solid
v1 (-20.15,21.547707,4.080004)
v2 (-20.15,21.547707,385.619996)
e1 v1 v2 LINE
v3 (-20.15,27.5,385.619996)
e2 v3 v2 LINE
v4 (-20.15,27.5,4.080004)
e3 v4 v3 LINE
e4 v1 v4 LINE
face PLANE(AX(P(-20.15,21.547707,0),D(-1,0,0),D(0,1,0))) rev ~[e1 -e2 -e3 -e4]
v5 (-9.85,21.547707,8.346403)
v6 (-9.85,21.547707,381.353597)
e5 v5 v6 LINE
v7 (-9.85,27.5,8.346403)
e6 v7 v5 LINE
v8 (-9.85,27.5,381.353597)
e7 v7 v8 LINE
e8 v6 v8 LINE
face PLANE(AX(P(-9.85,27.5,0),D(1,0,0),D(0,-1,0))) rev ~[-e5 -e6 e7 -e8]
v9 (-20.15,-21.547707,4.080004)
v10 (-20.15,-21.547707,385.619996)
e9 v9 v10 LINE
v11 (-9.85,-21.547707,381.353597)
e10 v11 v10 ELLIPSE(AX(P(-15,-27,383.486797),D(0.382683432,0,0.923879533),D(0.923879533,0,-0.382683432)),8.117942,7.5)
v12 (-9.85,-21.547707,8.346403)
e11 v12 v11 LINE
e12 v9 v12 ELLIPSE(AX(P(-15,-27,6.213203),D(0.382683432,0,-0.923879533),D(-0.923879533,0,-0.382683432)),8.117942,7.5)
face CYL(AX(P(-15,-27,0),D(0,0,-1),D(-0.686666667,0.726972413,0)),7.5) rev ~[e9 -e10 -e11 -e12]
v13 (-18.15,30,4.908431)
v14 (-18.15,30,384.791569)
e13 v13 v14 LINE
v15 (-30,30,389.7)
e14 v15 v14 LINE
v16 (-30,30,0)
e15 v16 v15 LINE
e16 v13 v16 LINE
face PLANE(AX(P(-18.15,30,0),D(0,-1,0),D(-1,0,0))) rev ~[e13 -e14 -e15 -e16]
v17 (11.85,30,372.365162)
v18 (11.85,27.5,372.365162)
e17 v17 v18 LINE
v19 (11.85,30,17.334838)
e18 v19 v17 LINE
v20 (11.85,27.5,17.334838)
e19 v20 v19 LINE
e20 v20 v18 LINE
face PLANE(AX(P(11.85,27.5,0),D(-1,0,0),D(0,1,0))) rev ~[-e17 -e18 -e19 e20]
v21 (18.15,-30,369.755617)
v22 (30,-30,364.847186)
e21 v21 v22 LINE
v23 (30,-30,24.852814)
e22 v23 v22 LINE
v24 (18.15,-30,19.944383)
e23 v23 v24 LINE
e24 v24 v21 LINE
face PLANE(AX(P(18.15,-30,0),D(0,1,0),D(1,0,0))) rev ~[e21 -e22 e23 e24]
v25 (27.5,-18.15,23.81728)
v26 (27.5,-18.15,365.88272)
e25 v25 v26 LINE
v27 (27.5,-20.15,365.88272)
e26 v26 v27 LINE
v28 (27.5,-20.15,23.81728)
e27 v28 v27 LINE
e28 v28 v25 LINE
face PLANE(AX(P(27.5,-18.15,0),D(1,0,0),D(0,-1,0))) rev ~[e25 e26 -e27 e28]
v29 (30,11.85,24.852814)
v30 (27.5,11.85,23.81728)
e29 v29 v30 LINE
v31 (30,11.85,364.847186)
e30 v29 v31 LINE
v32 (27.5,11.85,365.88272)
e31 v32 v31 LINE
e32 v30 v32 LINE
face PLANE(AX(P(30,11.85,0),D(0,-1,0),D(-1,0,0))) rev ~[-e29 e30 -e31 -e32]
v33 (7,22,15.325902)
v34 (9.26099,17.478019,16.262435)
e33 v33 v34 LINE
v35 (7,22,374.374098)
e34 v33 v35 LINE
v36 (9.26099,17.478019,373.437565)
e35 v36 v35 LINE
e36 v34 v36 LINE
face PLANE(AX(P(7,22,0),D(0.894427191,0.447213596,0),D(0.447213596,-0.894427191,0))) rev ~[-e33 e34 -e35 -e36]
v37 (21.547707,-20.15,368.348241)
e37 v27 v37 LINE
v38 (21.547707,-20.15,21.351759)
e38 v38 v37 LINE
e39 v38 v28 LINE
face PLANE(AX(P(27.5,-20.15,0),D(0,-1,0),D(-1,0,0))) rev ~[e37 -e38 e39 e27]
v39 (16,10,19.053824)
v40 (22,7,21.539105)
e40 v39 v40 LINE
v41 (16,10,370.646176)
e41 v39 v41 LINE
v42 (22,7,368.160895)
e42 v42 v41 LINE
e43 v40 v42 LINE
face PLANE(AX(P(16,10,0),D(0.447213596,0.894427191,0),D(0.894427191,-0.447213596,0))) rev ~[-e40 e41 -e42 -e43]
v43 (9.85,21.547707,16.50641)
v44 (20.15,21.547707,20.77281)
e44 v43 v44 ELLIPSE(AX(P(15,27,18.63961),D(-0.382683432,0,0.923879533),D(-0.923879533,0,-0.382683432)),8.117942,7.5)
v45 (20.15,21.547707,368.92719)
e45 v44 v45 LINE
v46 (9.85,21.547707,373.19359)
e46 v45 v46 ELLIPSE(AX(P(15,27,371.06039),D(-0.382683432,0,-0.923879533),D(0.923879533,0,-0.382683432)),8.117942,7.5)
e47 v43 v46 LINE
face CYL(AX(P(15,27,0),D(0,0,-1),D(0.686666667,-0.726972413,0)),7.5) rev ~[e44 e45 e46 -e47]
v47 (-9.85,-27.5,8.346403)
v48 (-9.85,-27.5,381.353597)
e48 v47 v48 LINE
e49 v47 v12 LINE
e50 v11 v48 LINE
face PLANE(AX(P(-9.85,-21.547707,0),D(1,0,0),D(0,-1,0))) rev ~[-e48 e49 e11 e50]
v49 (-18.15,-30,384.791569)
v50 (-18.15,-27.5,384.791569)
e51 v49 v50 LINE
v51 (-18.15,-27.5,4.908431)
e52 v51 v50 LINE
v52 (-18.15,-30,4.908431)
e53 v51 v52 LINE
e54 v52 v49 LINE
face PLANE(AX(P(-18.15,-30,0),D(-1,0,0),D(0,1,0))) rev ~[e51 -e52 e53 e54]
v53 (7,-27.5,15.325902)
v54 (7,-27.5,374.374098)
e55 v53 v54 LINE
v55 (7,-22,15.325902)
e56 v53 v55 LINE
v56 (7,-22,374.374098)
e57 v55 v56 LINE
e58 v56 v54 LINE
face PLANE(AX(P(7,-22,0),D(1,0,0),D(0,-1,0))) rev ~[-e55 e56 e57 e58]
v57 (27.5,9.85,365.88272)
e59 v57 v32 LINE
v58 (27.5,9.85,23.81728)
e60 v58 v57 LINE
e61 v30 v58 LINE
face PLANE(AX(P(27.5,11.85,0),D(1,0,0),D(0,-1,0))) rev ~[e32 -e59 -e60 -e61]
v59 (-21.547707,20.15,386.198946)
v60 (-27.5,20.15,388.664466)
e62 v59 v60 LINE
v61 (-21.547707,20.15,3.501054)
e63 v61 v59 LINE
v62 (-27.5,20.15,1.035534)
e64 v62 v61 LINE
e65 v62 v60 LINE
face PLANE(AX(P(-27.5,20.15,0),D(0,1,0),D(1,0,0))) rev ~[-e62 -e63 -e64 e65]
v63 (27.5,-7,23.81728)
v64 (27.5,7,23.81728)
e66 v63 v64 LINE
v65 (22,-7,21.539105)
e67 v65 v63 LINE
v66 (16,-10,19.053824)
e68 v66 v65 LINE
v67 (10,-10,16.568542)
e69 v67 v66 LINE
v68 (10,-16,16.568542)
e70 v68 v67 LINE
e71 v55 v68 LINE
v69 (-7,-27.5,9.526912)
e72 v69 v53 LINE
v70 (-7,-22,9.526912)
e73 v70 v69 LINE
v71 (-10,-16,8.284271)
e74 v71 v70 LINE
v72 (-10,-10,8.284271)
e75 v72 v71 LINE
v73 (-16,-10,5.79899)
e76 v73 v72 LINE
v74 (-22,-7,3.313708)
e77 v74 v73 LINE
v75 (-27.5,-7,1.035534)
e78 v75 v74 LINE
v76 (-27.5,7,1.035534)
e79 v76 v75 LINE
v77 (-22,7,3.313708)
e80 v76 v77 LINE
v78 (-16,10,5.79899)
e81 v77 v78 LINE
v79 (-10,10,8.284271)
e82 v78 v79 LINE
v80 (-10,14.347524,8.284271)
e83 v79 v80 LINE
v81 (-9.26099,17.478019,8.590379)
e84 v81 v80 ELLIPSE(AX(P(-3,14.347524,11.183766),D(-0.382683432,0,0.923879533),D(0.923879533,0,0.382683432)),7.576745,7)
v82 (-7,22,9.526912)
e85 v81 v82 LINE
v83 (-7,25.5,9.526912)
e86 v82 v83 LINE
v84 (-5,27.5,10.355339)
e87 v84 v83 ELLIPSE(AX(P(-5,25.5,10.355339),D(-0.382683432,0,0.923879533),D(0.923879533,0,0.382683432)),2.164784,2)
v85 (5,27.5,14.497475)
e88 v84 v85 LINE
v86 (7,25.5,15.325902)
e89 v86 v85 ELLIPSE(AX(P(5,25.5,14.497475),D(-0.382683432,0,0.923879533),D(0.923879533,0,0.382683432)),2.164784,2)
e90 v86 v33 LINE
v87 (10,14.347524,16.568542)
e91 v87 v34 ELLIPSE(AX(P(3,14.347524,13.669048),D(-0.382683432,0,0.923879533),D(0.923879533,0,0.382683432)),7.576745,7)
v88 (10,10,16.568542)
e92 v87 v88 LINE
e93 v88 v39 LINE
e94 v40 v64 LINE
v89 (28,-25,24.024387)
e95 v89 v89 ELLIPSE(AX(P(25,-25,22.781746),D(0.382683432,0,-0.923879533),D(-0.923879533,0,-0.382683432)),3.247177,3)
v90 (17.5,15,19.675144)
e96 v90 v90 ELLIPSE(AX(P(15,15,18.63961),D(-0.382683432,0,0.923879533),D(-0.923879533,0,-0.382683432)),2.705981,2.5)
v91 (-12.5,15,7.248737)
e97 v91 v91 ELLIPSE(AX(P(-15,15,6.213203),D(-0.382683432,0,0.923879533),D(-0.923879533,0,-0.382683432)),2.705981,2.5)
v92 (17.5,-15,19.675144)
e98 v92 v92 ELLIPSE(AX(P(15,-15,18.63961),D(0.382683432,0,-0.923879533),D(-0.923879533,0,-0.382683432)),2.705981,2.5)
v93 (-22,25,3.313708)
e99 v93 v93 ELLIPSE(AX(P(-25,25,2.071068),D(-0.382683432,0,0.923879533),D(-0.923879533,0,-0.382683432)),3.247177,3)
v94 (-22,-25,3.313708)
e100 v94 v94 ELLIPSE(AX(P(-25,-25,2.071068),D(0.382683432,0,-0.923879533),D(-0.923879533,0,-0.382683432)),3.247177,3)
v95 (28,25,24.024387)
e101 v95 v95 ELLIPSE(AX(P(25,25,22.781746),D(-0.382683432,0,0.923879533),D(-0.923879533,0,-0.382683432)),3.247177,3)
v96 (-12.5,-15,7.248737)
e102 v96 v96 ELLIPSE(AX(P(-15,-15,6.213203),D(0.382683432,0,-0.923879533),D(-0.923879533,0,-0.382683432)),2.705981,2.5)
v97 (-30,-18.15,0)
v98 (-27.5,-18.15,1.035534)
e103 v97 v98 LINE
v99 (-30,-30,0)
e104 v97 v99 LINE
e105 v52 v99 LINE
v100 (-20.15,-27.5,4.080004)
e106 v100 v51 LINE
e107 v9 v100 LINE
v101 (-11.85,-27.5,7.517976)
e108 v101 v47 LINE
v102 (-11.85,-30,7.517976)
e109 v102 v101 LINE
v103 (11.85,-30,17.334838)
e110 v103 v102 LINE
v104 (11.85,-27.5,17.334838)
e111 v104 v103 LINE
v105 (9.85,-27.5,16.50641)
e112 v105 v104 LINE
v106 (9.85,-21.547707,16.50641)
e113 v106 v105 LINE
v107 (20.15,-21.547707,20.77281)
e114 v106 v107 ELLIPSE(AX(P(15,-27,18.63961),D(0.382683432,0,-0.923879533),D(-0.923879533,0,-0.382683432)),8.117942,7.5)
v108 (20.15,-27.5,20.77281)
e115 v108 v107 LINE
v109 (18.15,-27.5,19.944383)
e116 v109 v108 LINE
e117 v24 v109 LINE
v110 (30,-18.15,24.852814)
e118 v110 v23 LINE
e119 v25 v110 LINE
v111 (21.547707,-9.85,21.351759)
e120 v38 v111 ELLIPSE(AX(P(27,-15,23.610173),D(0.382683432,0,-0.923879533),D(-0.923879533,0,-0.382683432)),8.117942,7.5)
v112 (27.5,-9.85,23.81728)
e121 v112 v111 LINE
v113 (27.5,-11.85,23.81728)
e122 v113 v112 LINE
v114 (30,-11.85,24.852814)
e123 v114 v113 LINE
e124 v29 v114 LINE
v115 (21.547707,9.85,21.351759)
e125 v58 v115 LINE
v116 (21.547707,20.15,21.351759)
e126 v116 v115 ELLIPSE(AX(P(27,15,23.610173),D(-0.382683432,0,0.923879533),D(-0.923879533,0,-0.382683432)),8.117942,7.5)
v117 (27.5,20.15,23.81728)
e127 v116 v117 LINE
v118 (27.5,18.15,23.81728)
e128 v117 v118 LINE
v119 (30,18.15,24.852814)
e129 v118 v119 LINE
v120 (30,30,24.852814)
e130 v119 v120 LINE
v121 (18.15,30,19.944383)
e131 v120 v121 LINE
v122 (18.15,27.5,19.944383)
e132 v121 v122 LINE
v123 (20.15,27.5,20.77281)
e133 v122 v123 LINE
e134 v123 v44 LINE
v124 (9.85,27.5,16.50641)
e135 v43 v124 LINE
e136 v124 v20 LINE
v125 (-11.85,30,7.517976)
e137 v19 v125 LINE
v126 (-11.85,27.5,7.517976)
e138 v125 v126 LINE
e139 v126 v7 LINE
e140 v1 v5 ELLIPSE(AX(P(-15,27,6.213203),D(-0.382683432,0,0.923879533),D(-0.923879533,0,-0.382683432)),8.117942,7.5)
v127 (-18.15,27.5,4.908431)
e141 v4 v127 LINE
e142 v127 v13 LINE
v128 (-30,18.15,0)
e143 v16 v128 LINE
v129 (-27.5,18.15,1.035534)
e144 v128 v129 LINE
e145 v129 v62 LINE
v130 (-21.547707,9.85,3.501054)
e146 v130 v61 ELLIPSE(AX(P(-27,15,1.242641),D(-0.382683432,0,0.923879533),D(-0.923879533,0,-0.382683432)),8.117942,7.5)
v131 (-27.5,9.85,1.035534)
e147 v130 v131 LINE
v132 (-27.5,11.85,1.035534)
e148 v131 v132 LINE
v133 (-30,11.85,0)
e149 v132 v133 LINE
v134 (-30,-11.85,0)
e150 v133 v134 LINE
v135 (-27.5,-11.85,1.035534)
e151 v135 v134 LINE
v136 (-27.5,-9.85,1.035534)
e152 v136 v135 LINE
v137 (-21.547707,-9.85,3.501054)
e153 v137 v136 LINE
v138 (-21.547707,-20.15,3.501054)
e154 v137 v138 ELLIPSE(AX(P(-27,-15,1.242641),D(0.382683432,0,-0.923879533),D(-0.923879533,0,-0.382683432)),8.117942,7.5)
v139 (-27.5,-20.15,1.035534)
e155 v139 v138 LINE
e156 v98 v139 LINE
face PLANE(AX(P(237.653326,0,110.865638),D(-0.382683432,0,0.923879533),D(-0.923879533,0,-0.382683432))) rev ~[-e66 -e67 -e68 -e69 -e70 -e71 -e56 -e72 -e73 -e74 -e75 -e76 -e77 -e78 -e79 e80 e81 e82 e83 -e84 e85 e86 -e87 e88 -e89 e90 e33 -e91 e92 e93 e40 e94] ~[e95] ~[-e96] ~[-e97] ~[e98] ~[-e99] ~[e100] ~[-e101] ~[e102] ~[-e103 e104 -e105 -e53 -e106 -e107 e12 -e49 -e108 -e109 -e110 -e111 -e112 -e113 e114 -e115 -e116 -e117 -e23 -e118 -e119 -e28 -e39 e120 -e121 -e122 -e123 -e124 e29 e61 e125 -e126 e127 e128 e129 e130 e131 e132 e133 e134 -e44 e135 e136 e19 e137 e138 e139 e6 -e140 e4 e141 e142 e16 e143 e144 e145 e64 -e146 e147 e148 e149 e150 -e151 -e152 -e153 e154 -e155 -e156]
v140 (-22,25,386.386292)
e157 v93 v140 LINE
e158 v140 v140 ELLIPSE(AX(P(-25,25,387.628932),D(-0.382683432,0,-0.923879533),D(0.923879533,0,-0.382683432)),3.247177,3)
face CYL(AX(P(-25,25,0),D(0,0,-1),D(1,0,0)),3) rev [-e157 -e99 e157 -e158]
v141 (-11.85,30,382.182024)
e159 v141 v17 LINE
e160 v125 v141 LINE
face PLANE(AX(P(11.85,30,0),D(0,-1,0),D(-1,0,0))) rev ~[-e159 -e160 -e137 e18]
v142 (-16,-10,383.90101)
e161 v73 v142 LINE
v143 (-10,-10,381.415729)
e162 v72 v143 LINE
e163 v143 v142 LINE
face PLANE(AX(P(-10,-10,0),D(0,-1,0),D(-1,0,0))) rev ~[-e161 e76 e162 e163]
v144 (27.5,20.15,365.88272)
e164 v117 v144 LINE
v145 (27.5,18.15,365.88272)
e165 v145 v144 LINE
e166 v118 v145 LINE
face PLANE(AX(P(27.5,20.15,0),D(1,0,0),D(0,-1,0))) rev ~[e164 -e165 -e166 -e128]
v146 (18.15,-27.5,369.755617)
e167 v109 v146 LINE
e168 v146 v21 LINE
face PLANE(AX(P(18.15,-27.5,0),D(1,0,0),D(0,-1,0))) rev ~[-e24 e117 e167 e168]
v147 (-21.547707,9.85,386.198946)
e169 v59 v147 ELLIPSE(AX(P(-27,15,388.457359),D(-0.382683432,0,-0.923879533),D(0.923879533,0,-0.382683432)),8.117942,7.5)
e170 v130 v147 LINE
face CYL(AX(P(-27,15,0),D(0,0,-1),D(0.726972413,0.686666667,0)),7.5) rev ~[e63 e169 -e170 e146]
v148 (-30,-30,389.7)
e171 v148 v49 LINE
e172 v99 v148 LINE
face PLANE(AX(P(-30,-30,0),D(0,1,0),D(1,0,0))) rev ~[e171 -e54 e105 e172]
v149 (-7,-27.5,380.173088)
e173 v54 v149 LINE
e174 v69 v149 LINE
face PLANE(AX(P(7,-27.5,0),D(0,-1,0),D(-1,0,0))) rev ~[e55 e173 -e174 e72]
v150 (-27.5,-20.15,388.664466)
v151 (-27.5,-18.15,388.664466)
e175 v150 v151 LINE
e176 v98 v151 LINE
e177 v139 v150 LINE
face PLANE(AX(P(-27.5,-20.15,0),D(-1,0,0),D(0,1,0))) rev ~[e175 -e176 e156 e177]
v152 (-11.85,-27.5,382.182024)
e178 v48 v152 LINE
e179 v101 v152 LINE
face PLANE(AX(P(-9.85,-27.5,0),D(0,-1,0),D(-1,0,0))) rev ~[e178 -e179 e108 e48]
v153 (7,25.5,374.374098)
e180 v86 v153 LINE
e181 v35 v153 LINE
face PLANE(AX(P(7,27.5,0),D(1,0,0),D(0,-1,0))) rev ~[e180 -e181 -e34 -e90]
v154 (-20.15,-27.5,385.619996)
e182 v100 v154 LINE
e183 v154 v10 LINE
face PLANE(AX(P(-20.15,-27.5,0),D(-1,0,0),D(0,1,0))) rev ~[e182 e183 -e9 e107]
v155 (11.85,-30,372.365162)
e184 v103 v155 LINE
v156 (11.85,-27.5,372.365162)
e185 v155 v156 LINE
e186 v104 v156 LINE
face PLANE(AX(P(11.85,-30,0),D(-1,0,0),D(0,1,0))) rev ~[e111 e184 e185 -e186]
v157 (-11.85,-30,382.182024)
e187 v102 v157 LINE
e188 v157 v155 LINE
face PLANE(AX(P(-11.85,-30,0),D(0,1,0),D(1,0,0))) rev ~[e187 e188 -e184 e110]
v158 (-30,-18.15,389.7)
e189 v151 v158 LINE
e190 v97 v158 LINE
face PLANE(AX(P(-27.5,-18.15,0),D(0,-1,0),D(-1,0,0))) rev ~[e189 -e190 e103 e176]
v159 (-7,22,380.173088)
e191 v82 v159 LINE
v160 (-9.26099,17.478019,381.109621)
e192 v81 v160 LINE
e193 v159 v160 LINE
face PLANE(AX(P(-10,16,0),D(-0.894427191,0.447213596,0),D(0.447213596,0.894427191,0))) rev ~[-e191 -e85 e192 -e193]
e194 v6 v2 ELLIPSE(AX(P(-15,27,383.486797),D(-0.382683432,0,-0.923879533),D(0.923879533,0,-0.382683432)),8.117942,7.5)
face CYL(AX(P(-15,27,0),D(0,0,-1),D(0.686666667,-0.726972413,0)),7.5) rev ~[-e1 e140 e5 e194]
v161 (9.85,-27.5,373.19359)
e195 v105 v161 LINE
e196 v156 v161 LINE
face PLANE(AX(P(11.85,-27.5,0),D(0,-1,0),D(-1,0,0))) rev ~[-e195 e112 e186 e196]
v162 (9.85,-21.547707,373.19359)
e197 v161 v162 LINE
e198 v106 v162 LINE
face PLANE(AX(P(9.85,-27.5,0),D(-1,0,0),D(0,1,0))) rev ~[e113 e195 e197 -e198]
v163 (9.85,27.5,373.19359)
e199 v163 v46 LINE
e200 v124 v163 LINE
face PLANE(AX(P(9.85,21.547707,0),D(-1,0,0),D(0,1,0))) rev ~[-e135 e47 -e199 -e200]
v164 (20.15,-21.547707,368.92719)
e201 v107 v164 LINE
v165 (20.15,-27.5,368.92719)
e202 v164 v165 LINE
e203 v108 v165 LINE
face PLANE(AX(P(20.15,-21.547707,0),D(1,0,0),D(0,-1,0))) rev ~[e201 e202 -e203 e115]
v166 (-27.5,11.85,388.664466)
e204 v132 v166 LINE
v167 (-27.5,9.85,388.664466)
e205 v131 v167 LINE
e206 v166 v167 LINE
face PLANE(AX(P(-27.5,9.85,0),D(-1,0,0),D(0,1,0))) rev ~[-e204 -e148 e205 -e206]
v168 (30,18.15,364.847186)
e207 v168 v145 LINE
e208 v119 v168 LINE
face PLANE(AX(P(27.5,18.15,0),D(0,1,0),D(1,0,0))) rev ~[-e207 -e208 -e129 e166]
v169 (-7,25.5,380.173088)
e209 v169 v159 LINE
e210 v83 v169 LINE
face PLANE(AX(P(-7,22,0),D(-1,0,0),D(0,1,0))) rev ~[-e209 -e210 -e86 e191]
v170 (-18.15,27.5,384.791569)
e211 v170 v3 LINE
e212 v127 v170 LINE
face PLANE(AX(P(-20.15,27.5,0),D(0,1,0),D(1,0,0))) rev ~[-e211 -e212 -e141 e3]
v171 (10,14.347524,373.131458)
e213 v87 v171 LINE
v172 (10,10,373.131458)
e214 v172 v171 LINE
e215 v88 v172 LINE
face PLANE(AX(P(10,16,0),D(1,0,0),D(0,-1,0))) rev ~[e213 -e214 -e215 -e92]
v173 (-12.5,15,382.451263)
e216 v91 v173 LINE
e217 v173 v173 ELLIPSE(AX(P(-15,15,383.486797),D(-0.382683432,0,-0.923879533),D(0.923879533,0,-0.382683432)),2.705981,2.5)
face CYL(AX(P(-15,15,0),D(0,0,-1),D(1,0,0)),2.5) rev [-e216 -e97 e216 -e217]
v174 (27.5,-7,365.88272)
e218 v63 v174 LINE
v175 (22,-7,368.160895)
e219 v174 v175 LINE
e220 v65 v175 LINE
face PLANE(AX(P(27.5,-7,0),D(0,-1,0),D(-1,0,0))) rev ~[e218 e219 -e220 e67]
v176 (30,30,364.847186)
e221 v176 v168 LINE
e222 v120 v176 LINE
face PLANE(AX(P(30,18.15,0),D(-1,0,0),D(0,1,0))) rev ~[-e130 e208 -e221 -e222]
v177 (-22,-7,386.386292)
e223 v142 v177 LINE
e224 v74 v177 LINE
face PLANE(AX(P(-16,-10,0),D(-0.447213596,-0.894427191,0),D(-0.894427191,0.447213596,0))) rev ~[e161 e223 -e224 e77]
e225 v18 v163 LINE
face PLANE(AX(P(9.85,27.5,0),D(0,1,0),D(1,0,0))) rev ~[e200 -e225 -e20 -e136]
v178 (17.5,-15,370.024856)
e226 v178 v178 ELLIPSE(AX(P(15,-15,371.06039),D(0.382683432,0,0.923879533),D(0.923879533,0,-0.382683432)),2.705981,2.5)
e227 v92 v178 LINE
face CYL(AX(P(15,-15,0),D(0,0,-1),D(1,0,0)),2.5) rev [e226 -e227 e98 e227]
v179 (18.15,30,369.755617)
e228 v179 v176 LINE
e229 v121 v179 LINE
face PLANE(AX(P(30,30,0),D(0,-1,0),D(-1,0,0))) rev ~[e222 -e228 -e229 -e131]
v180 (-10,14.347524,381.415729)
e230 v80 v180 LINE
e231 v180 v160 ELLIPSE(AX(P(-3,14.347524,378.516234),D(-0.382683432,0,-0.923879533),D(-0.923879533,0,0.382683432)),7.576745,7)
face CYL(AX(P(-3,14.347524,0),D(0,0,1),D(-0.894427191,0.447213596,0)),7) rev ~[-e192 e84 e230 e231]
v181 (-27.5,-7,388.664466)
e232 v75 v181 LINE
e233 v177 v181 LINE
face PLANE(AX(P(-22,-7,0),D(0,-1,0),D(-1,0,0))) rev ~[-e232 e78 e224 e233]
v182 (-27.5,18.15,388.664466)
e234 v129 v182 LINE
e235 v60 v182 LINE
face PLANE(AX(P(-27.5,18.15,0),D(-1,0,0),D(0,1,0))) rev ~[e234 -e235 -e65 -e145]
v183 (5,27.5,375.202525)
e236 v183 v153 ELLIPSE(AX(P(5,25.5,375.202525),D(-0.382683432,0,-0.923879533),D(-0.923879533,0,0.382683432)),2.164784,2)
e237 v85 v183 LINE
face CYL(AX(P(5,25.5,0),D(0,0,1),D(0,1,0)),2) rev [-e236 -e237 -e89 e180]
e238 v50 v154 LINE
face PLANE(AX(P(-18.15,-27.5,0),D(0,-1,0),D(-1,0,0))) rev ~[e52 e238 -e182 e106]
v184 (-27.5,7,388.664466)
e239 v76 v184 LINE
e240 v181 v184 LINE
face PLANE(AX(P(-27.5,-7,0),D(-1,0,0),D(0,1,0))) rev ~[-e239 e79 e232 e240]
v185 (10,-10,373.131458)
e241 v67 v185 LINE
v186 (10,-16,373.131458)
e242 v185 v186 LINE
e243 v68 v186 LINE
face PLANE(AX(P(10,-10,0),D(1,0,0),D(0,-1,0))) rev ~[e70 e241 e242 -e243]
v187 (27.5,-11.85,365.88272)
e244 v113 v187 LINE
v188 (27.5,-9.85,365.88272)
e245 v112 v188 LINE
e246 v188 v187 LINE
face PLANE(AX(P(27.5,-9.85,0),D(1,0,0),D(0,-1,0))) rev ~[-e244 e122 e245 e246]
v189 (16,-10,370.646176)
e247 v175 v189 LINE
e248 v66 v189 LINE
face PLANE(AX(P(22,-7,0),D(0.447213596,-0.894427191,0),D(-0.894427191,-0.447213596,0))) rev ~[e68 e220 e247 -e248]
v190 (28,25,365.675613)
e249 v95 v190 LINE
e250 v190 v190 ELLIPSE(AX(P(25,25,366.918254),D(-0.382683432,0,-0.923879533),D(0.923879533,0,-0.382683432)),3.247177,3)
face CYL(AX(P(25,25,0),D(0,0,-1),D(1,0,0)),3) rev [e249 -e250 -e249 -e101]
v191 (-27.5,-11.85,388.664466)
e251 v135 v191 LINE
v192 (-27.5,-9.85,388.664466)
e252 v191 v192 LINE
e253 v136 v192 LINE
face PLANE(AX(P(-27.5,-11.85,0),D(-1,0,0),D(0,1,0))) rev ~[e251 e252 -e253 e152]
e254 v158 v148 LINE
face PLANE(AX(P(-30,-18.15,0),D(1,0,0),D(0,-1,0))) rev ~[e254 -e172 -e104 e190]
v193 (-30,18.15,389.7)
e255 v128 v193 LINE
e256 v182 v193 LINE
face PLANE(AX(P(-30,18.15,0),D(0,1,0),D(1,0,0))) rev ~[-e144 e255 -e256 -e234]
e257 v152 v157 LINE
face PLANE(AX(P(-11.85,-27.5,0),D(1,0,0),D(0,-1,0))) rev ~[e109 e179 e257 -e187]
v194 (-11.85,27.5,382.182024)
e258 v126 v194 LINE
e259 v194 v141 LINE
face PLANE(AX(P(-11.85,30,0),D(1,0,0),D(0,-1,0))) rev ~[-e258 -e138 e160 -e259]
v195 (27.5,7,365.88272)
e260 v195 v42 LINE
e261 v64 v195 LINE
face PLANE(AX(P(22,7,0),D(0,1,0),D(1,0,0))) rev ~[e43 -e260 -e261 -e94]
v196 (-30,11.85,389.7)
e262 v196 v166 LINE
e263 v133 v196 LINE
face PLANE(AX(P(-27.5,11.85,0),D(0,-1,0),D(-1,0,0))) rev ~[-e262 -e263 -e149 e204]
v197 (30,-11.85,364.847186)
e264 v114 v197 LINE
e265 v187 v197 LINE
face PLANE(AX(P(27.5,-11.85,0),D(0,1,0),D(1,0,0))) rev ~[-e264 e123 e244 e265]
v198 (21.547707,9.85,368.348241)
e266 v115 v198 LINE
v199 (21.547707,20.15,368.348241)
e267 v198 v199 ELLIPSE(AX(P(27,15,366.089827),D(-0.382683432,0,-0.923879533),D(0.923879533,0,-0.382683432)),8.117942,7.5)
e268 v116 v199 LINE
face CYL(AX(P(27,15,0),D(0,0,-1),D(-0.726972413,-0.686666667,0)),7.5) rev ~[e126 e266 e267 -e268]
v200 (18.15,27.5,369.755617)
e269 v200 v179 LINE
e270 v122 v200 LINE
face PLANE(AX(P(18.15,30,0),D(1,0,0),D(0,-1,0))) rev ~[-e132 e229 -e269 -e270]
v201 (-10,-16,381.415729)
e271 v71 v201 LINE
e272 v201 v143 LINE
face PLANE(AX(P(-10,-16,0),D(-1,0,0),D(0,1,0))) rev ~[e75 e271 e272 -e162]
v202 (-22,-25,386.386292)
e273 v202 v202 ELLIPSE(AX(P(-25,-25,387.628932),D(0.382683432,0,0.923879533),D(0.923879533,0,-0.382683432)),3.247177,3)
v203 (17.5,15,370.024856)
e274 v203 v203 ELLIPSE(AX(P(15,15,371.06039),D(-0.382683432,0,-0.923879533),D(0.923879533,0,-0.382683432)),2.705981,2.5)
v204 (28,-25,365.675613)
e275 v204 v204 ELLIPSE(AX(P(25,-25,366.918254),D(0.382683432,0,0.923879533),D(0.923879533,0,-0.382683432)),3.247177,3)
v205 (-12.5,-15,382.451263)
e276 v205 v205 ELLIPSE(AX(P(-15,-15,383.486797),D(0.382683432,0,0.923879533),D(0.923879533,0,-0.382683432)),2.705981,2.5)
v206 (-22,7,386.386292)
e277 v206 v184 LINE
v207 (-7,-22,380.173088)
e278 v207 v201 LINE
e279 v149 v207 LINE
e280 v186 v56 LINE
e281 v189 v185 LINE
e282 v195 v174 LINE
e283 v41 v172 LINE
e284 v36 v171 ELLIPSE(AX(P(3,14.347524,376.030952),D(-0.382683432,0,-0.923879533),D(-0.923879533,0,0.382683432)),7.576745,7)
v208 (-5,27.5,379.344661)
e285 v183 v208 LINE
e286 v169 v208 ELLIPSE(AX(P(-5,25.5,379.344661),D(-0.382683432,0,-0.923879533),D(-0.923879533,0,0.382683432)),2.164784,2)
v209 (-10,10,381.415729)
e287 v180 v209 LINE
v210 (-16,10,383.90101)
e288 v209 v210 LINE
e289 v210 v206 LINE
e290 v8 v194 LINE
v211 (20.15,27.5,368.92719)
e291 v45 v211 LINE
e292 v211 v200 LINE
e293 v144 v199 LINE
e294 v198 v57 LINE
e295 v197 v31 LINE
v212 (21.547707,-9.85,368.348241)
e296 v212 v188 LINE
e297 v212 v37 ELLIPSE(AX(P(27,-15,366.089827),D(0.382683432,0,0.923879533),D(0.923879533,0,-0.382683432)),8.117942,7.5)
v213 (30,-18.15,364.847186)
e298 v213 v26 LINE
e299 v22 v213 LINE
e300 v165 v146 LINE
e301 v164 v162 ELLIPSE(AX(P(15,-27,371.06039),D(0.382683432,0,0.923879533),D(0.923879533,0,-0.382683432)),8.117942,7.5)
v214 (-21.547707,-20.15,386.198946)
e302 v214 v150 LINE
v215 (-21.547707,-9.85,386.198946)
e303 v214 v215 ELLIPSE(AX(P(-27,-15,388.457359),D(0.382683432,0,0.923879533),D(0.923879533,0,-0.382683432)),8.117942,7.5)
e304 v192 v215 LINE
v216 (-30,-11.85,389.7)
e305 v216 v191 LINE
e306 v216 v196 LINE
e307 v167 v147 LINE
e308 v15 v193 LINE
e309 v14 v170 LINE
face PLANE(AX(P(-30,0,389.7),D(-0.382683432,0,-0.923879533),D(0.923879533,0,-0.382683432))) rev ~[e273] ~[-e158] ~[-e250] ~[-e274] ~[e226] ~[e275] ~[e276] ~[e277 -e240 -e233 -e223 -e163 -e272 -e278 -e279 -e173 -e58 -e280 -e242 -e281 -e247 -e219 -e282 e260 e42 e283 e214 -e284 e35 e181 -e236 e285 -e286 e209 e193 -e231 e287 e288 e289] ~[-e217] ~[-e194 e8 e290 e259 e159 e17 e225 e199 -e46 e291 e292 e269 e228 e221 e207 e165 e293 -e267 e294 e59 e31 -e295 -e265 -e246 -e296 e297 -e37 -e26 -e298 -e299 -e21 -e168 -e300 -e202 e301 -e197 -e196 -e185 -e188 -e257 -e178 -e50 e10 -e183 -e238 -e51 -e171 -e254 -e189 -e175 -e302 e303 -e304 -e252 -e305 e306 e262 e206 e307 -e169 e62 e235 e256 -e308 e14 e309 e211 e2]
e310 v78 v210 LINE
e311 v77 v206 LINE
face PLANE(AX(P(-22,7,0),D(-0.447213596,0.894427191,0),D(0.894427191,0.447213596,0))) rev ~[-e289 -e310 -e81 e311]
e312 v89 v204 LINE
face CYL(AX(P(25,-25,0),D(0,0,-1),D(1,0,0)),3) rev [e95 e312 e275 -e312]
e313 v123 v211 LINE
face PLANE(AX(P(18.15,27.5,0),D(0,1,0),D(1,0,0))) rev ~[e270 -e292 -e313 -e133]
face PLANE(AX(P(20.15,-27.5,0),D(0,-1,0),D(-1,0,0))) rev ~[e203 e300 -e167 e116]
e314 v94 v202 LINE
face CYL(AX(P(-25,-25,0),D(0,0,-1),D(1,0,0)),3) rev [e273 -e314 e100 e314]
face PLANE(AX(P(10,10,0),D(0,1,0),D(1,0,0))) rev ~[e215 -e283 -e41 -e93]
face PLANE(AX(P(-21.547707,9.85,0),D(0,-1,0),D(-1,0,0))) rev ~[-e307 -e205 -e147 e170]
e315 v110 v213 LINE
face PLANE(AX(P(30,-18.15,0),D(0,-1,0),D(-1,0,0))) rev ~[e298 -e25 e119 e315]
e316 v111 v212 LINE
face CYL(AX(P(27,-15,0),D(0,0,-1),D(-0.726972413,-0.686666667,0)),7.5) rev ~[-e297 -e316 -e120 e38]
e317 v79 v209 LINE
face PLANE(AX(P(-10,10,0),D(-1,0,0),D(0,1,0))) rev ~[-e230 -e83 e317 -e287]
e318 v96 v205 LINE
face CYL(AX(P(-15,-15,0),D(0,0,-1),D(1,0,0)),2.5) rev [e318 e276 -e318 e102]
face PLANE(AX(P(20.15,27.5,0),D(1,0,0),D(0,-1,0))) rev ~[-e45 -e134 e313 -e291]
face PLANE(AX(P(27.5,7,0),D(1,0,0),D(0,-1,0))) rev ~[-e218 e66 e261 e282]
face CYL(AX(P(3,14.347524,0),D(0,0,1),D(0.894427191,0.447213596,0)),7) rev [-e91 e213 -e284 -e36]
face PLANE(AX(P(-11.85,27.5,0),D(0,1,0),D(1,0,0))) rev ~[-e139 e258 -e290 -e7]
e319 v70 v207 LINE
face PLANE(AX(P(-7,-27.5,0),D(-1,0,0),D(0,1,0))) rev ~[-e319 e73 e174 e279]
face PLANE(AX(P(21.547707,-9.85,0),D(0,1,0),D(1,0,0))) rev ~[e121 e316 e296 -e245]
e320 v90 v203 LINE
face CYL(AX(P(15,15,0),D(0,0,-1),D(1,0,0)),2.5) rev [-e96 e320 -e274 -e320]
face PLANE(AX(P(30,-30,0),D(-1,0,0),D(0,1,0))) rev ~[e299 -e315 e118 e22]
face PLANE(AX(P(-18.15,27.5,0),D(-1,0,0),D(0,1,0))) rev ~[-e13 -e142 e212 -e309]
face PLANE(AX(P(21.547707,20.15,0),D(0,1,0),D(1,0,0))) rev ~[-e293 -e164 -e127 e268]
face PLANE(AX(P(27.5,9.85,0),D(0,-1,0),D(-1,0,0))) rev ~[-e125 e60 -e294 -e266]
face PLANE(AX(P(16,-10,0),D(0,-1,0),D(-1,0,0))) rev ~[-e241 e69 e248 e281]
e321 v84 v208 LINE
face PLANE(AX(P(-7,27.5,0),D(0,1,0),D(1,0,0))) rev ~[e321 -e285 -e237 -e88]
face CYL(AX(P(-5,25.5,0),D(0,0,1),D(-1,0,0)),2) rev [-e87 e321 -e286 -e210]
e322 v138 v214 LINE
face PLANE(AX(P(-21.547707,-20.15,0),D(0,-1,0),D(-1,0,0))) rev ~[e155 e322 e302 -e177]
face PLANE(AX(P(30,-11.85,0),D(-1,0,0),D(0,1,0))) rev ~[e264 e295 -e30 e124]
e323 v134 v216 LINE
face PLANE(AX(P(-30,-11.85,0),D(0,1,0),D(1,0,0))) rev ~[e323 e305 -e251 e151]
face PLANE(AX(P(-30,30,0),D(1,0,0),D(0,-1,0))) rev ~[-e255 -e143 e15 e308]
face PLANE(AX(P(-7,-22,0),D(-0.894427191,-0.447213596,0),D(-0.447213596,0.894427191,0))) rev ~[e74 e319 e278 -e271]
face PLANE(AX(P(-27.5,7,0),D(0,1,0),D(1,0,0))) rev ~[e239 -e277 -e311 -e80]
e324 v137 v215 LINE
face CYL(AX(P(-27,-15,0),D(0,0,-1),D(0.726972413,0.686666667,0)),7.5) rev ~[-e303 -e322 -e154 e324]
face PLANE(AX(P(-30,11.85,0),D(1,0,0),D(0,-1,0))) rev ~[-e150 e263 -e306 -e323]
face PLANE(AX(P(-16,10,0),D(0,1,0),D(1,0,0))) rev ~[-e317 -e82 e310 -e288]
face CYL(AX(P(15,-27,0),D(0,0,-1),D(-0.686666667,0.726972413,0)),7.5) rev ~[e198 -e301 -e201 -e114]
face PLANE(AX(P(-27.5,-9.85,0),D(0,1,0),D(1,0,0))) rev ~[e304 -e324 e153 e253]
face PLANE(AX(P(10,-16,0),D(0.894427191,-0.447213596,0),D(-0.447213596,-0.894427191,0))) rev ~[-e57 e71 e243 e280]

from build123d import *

# Parameters (mm, degrees)
F0_R          = 3
F0_R_2        = 2.5
F1_DEPTH      = 389.7
F2_R          = 2
F3_R          = 7
F5_DEPTH      = 30
F5_DEPTH_BACK = 30


# Not quite as in the source:
# - a feature names something its author has since deleted; it is built from what else it names


with BuildPart() as f1:
    # F0 (on Top) → F1 (new body)
    with BuildSketch(Plane.XY):
        with BuildLine():
            Line((18.15, -30), (30, -30))
            Line((30, -30), (30, -18.15))
            Line((30, -18.15), (27.5, -18.15))
            Line((27.5, -18.15), (27.5, -20.15))
            Line((27.5, -20.15), (21.5477069044, -20.15))
            ThreePointArc((21.5477069044, -20.15), (19.5, -15), (21.5477069044, -9.85))
            Line((21.5477069044, -9.85), (27.5, -9.85))
            Line((27.5, -9.85), (27.5, -11.85))
            Line((27.5, -11.85), (30, -11.85))
            Line((30, -11.85), (30, 11.85))
            Line((30, 11.85), (27.5, 11.85))
            Line((27.5, 11.85), (27.5, 9.85))
            Line((27.5, 9.85), (21.5477069044, 9.85))
            ThreePointArc((21.5477069044, 9.85), (19.5, 15), (21.5477069044, 20.15))
            Line((21.5477069044, 20.15), (27.5, 20.15))
            Line((27.5, 20.15), (27.5, 18.15))
            Line((27.5, 18.15), (30, 18.15))
            Line((30, 18.15), (30, 30))
            Line((30, 30), (18.15, 30))
            Line((18.15, 30), (18.15, 27.5))
            Line((18.15, 27.5), (20.15, 27.5))
            Line((20.15, 27.5), (20.15, 21.5477069044))
            ThreePointArc((20.15, 21.5477069044), (15, 19.5), (9.85, 21.5477069044))
            Line((9.85, 21.5477069044), (9.85, 27.5))
            Line((9.85, 27.5), (11.85, 27.5))
            Line((11.85, 27.5), (11.85, 30))
            Line((11.85, 30), (-11.85, 30))
            Line((-11.85, 30), (-11.85, 27.5))
            Line((-11.85, 27.5), (-9.85, 27.5))
            Line((-9.85, 27.5), (-9.85, 21.5477069044))
            ThreePointArc((-9.85, 21.5477069044), (-15, 19.5), (-20.15, 21.5477069044))
            Line((-20.15, 21.5477069044), (-20.15, 27.5))
            Line((-20.15, 27.5), (-18.15, 27.5))
            Line((-18.15, 27.5), (-18.15, 30))
            Line((-18.15, 30), (-30, 30))
            Line((-30, 30), (-30, 18.15))
            Line((-30, 18.15), (-27.5, 18.15))
            Line((-27.5, 18.15), (-27.5, 20.15))
            Line((-27.5, 20.15), (-21.5477069044, 20.15))
            ThreePointArc((-21.5477069044, 20.15), (-19.5, 15), (-21.5477069044, 9.85))
            Line((-21.5477069044, 9.85), (-27.5, 9.85))
            Line((-27.5, 9.85), (-27.5, 11.85))
            Line((-27.5, 11.85), (-30, 11.85))
            Line((-30, 11.85), (-30, -11.85))
            Line((-30, -11.85), (-27.5, -11.85))
            Line((-27.5, -11.85), (-27.5, -9.85))
            Line((-27.5, -9.85), (-21.5477069044, -9.85))
            ThreePointArc((-21.5477069044, -9.85), (-19.5, -15), (-21.5477069044, -20.15))
            Line((-21.5477069044, -20.15), (-27.5, -20.15))
            Line((-27.5, -20.15), (-27.5, -18.15))
            Line((-27.5, -18.15), (-30, -18.15))
            Line((-30, -18.15), (-30, -30))
            Line((-30, -30), (-18.15, -30))
            Line((-18.15, -30), (-18.15, -27.5))
            Line((-18.15, -27.5), (-20.15, -27.5))
            Line((-20.15, -27.5), (-20.15, -21.5477069044))
            ThreePointArc((-20.15, -21.5477069044), (-15, -19.5), (-9.85, -21.5477069044))
            Line((-9.85, -21.5477069044), (-9.85, -27.5))
            Line((-9.85, -27.5), (-11.85, -27.5))
            Line((-11.85, -27.5), (-11.85, -30))
            Line((-11.85, -30), (11.85, -30))
            Line((11.85, -30), (11.85, -27.5))
            Line((11.85, -27.5), (9.85, -27.5))
            Line((9.85, -27.5), (9.85, -21.5477069044))
            ThreePointArc((9.85, -21.5477069044), (15, -19.5), (20.15, -21.5477069044))
            Line((20.15, -21.5477069044), (20.15, -27.5))
            Line((20.15, -27.5), (18.15, -27.5))
            Line((18.15, -27.5), (18.15, -30))
        make_face()
        with Locations((-25, -25)):
            Circle(F0_R, mode=Mode.SUBTRACT)
        with Locations((-15, -15)):
            Circle(F0_R_2, mode=Mode.SUBTRACT)
        with Locations((25, -25)):
            Circle(F0_R, mode=Mode.SUBTRACT)
        with Locations((15, -15)):
            Circle(F0_R_2, mode=Mode.SUBTRACT)
        with Locations((-25, 25)):
            Circle(F0_R, mode=Mode.SUBTRACT)
        with Locations((-15, 15)):
            Circle(F0_R_2, mode=Mode.SUBTRACT)
        Polygon((-7, 22), (-7, 27.5), (0, 27.5), (7, 27.5), (7, 22), (10, 16), (10, 10), (16, 10), (22, 7), (27.5, 7), (27.5, 0), (27.5, -7), (22, -7), (16, -10), (10, -10), (10, -16), (7, -22), (7, -27.5), (0, -27.5), (-7, -27.5), (-7, -22), (-10, -16), (-10, -10), (-16, -10), (-22, -7), (-27.5, -7), (-27.5, 0), (-27.5, 7), (-22, 7), (-16, 10), (-10, 10), (-10, 16), align=None, mode=Mode.SUBTRACT)
        with Locations((15, 15)):
            Circle(F0_R_2, mode=Mode.SUBTRACT)
        with Locations((25, 25)):
            Circle(F0_R, mode=Mode.SUBTRACT)
    extrude(amount=F1_DEPTH)

    # F2
    f2_edges = [f1.edges().sort_by_distance(p)[0] for p in [
        (-7, 27.5, 194.85),
        (7, 27.5, 194.85),
    ]]
    fillet(f2_edges, radius=F2_R)

    # F3
    f3_edges = [f1.edges().sort_by_distance(p)[0] for p in [
        (-10, 16, 194.85),
        (10, 16, 194.85),
    ]]
    fillet(f3_edges, radius=F3_R)

    # F4 (on Front) → F5 (cut, two sides)
    with BuildSketch(Plane.XZ) as f5_sk:
        Polygon((262.6101504464, 391.20035759), (13.3822209239, 494.4339461204), (-30, 389.7), (219.2279295224, 286.4664114696), align=None)
        Polygon((237.6533260841, 110.8656376783), (-30, 0), (20.6125739706, -122.1895625065), (288.2659000547, -11.3239248282), align=None)
    extrude(amount=F5_DEPTH, mode=Mode.SUBTRACT)
    extrude(f5_sk.sketch, amount=-F5_DEPTH_BACK, mode=Mode.SUBTRACT)


solid = f1.part
